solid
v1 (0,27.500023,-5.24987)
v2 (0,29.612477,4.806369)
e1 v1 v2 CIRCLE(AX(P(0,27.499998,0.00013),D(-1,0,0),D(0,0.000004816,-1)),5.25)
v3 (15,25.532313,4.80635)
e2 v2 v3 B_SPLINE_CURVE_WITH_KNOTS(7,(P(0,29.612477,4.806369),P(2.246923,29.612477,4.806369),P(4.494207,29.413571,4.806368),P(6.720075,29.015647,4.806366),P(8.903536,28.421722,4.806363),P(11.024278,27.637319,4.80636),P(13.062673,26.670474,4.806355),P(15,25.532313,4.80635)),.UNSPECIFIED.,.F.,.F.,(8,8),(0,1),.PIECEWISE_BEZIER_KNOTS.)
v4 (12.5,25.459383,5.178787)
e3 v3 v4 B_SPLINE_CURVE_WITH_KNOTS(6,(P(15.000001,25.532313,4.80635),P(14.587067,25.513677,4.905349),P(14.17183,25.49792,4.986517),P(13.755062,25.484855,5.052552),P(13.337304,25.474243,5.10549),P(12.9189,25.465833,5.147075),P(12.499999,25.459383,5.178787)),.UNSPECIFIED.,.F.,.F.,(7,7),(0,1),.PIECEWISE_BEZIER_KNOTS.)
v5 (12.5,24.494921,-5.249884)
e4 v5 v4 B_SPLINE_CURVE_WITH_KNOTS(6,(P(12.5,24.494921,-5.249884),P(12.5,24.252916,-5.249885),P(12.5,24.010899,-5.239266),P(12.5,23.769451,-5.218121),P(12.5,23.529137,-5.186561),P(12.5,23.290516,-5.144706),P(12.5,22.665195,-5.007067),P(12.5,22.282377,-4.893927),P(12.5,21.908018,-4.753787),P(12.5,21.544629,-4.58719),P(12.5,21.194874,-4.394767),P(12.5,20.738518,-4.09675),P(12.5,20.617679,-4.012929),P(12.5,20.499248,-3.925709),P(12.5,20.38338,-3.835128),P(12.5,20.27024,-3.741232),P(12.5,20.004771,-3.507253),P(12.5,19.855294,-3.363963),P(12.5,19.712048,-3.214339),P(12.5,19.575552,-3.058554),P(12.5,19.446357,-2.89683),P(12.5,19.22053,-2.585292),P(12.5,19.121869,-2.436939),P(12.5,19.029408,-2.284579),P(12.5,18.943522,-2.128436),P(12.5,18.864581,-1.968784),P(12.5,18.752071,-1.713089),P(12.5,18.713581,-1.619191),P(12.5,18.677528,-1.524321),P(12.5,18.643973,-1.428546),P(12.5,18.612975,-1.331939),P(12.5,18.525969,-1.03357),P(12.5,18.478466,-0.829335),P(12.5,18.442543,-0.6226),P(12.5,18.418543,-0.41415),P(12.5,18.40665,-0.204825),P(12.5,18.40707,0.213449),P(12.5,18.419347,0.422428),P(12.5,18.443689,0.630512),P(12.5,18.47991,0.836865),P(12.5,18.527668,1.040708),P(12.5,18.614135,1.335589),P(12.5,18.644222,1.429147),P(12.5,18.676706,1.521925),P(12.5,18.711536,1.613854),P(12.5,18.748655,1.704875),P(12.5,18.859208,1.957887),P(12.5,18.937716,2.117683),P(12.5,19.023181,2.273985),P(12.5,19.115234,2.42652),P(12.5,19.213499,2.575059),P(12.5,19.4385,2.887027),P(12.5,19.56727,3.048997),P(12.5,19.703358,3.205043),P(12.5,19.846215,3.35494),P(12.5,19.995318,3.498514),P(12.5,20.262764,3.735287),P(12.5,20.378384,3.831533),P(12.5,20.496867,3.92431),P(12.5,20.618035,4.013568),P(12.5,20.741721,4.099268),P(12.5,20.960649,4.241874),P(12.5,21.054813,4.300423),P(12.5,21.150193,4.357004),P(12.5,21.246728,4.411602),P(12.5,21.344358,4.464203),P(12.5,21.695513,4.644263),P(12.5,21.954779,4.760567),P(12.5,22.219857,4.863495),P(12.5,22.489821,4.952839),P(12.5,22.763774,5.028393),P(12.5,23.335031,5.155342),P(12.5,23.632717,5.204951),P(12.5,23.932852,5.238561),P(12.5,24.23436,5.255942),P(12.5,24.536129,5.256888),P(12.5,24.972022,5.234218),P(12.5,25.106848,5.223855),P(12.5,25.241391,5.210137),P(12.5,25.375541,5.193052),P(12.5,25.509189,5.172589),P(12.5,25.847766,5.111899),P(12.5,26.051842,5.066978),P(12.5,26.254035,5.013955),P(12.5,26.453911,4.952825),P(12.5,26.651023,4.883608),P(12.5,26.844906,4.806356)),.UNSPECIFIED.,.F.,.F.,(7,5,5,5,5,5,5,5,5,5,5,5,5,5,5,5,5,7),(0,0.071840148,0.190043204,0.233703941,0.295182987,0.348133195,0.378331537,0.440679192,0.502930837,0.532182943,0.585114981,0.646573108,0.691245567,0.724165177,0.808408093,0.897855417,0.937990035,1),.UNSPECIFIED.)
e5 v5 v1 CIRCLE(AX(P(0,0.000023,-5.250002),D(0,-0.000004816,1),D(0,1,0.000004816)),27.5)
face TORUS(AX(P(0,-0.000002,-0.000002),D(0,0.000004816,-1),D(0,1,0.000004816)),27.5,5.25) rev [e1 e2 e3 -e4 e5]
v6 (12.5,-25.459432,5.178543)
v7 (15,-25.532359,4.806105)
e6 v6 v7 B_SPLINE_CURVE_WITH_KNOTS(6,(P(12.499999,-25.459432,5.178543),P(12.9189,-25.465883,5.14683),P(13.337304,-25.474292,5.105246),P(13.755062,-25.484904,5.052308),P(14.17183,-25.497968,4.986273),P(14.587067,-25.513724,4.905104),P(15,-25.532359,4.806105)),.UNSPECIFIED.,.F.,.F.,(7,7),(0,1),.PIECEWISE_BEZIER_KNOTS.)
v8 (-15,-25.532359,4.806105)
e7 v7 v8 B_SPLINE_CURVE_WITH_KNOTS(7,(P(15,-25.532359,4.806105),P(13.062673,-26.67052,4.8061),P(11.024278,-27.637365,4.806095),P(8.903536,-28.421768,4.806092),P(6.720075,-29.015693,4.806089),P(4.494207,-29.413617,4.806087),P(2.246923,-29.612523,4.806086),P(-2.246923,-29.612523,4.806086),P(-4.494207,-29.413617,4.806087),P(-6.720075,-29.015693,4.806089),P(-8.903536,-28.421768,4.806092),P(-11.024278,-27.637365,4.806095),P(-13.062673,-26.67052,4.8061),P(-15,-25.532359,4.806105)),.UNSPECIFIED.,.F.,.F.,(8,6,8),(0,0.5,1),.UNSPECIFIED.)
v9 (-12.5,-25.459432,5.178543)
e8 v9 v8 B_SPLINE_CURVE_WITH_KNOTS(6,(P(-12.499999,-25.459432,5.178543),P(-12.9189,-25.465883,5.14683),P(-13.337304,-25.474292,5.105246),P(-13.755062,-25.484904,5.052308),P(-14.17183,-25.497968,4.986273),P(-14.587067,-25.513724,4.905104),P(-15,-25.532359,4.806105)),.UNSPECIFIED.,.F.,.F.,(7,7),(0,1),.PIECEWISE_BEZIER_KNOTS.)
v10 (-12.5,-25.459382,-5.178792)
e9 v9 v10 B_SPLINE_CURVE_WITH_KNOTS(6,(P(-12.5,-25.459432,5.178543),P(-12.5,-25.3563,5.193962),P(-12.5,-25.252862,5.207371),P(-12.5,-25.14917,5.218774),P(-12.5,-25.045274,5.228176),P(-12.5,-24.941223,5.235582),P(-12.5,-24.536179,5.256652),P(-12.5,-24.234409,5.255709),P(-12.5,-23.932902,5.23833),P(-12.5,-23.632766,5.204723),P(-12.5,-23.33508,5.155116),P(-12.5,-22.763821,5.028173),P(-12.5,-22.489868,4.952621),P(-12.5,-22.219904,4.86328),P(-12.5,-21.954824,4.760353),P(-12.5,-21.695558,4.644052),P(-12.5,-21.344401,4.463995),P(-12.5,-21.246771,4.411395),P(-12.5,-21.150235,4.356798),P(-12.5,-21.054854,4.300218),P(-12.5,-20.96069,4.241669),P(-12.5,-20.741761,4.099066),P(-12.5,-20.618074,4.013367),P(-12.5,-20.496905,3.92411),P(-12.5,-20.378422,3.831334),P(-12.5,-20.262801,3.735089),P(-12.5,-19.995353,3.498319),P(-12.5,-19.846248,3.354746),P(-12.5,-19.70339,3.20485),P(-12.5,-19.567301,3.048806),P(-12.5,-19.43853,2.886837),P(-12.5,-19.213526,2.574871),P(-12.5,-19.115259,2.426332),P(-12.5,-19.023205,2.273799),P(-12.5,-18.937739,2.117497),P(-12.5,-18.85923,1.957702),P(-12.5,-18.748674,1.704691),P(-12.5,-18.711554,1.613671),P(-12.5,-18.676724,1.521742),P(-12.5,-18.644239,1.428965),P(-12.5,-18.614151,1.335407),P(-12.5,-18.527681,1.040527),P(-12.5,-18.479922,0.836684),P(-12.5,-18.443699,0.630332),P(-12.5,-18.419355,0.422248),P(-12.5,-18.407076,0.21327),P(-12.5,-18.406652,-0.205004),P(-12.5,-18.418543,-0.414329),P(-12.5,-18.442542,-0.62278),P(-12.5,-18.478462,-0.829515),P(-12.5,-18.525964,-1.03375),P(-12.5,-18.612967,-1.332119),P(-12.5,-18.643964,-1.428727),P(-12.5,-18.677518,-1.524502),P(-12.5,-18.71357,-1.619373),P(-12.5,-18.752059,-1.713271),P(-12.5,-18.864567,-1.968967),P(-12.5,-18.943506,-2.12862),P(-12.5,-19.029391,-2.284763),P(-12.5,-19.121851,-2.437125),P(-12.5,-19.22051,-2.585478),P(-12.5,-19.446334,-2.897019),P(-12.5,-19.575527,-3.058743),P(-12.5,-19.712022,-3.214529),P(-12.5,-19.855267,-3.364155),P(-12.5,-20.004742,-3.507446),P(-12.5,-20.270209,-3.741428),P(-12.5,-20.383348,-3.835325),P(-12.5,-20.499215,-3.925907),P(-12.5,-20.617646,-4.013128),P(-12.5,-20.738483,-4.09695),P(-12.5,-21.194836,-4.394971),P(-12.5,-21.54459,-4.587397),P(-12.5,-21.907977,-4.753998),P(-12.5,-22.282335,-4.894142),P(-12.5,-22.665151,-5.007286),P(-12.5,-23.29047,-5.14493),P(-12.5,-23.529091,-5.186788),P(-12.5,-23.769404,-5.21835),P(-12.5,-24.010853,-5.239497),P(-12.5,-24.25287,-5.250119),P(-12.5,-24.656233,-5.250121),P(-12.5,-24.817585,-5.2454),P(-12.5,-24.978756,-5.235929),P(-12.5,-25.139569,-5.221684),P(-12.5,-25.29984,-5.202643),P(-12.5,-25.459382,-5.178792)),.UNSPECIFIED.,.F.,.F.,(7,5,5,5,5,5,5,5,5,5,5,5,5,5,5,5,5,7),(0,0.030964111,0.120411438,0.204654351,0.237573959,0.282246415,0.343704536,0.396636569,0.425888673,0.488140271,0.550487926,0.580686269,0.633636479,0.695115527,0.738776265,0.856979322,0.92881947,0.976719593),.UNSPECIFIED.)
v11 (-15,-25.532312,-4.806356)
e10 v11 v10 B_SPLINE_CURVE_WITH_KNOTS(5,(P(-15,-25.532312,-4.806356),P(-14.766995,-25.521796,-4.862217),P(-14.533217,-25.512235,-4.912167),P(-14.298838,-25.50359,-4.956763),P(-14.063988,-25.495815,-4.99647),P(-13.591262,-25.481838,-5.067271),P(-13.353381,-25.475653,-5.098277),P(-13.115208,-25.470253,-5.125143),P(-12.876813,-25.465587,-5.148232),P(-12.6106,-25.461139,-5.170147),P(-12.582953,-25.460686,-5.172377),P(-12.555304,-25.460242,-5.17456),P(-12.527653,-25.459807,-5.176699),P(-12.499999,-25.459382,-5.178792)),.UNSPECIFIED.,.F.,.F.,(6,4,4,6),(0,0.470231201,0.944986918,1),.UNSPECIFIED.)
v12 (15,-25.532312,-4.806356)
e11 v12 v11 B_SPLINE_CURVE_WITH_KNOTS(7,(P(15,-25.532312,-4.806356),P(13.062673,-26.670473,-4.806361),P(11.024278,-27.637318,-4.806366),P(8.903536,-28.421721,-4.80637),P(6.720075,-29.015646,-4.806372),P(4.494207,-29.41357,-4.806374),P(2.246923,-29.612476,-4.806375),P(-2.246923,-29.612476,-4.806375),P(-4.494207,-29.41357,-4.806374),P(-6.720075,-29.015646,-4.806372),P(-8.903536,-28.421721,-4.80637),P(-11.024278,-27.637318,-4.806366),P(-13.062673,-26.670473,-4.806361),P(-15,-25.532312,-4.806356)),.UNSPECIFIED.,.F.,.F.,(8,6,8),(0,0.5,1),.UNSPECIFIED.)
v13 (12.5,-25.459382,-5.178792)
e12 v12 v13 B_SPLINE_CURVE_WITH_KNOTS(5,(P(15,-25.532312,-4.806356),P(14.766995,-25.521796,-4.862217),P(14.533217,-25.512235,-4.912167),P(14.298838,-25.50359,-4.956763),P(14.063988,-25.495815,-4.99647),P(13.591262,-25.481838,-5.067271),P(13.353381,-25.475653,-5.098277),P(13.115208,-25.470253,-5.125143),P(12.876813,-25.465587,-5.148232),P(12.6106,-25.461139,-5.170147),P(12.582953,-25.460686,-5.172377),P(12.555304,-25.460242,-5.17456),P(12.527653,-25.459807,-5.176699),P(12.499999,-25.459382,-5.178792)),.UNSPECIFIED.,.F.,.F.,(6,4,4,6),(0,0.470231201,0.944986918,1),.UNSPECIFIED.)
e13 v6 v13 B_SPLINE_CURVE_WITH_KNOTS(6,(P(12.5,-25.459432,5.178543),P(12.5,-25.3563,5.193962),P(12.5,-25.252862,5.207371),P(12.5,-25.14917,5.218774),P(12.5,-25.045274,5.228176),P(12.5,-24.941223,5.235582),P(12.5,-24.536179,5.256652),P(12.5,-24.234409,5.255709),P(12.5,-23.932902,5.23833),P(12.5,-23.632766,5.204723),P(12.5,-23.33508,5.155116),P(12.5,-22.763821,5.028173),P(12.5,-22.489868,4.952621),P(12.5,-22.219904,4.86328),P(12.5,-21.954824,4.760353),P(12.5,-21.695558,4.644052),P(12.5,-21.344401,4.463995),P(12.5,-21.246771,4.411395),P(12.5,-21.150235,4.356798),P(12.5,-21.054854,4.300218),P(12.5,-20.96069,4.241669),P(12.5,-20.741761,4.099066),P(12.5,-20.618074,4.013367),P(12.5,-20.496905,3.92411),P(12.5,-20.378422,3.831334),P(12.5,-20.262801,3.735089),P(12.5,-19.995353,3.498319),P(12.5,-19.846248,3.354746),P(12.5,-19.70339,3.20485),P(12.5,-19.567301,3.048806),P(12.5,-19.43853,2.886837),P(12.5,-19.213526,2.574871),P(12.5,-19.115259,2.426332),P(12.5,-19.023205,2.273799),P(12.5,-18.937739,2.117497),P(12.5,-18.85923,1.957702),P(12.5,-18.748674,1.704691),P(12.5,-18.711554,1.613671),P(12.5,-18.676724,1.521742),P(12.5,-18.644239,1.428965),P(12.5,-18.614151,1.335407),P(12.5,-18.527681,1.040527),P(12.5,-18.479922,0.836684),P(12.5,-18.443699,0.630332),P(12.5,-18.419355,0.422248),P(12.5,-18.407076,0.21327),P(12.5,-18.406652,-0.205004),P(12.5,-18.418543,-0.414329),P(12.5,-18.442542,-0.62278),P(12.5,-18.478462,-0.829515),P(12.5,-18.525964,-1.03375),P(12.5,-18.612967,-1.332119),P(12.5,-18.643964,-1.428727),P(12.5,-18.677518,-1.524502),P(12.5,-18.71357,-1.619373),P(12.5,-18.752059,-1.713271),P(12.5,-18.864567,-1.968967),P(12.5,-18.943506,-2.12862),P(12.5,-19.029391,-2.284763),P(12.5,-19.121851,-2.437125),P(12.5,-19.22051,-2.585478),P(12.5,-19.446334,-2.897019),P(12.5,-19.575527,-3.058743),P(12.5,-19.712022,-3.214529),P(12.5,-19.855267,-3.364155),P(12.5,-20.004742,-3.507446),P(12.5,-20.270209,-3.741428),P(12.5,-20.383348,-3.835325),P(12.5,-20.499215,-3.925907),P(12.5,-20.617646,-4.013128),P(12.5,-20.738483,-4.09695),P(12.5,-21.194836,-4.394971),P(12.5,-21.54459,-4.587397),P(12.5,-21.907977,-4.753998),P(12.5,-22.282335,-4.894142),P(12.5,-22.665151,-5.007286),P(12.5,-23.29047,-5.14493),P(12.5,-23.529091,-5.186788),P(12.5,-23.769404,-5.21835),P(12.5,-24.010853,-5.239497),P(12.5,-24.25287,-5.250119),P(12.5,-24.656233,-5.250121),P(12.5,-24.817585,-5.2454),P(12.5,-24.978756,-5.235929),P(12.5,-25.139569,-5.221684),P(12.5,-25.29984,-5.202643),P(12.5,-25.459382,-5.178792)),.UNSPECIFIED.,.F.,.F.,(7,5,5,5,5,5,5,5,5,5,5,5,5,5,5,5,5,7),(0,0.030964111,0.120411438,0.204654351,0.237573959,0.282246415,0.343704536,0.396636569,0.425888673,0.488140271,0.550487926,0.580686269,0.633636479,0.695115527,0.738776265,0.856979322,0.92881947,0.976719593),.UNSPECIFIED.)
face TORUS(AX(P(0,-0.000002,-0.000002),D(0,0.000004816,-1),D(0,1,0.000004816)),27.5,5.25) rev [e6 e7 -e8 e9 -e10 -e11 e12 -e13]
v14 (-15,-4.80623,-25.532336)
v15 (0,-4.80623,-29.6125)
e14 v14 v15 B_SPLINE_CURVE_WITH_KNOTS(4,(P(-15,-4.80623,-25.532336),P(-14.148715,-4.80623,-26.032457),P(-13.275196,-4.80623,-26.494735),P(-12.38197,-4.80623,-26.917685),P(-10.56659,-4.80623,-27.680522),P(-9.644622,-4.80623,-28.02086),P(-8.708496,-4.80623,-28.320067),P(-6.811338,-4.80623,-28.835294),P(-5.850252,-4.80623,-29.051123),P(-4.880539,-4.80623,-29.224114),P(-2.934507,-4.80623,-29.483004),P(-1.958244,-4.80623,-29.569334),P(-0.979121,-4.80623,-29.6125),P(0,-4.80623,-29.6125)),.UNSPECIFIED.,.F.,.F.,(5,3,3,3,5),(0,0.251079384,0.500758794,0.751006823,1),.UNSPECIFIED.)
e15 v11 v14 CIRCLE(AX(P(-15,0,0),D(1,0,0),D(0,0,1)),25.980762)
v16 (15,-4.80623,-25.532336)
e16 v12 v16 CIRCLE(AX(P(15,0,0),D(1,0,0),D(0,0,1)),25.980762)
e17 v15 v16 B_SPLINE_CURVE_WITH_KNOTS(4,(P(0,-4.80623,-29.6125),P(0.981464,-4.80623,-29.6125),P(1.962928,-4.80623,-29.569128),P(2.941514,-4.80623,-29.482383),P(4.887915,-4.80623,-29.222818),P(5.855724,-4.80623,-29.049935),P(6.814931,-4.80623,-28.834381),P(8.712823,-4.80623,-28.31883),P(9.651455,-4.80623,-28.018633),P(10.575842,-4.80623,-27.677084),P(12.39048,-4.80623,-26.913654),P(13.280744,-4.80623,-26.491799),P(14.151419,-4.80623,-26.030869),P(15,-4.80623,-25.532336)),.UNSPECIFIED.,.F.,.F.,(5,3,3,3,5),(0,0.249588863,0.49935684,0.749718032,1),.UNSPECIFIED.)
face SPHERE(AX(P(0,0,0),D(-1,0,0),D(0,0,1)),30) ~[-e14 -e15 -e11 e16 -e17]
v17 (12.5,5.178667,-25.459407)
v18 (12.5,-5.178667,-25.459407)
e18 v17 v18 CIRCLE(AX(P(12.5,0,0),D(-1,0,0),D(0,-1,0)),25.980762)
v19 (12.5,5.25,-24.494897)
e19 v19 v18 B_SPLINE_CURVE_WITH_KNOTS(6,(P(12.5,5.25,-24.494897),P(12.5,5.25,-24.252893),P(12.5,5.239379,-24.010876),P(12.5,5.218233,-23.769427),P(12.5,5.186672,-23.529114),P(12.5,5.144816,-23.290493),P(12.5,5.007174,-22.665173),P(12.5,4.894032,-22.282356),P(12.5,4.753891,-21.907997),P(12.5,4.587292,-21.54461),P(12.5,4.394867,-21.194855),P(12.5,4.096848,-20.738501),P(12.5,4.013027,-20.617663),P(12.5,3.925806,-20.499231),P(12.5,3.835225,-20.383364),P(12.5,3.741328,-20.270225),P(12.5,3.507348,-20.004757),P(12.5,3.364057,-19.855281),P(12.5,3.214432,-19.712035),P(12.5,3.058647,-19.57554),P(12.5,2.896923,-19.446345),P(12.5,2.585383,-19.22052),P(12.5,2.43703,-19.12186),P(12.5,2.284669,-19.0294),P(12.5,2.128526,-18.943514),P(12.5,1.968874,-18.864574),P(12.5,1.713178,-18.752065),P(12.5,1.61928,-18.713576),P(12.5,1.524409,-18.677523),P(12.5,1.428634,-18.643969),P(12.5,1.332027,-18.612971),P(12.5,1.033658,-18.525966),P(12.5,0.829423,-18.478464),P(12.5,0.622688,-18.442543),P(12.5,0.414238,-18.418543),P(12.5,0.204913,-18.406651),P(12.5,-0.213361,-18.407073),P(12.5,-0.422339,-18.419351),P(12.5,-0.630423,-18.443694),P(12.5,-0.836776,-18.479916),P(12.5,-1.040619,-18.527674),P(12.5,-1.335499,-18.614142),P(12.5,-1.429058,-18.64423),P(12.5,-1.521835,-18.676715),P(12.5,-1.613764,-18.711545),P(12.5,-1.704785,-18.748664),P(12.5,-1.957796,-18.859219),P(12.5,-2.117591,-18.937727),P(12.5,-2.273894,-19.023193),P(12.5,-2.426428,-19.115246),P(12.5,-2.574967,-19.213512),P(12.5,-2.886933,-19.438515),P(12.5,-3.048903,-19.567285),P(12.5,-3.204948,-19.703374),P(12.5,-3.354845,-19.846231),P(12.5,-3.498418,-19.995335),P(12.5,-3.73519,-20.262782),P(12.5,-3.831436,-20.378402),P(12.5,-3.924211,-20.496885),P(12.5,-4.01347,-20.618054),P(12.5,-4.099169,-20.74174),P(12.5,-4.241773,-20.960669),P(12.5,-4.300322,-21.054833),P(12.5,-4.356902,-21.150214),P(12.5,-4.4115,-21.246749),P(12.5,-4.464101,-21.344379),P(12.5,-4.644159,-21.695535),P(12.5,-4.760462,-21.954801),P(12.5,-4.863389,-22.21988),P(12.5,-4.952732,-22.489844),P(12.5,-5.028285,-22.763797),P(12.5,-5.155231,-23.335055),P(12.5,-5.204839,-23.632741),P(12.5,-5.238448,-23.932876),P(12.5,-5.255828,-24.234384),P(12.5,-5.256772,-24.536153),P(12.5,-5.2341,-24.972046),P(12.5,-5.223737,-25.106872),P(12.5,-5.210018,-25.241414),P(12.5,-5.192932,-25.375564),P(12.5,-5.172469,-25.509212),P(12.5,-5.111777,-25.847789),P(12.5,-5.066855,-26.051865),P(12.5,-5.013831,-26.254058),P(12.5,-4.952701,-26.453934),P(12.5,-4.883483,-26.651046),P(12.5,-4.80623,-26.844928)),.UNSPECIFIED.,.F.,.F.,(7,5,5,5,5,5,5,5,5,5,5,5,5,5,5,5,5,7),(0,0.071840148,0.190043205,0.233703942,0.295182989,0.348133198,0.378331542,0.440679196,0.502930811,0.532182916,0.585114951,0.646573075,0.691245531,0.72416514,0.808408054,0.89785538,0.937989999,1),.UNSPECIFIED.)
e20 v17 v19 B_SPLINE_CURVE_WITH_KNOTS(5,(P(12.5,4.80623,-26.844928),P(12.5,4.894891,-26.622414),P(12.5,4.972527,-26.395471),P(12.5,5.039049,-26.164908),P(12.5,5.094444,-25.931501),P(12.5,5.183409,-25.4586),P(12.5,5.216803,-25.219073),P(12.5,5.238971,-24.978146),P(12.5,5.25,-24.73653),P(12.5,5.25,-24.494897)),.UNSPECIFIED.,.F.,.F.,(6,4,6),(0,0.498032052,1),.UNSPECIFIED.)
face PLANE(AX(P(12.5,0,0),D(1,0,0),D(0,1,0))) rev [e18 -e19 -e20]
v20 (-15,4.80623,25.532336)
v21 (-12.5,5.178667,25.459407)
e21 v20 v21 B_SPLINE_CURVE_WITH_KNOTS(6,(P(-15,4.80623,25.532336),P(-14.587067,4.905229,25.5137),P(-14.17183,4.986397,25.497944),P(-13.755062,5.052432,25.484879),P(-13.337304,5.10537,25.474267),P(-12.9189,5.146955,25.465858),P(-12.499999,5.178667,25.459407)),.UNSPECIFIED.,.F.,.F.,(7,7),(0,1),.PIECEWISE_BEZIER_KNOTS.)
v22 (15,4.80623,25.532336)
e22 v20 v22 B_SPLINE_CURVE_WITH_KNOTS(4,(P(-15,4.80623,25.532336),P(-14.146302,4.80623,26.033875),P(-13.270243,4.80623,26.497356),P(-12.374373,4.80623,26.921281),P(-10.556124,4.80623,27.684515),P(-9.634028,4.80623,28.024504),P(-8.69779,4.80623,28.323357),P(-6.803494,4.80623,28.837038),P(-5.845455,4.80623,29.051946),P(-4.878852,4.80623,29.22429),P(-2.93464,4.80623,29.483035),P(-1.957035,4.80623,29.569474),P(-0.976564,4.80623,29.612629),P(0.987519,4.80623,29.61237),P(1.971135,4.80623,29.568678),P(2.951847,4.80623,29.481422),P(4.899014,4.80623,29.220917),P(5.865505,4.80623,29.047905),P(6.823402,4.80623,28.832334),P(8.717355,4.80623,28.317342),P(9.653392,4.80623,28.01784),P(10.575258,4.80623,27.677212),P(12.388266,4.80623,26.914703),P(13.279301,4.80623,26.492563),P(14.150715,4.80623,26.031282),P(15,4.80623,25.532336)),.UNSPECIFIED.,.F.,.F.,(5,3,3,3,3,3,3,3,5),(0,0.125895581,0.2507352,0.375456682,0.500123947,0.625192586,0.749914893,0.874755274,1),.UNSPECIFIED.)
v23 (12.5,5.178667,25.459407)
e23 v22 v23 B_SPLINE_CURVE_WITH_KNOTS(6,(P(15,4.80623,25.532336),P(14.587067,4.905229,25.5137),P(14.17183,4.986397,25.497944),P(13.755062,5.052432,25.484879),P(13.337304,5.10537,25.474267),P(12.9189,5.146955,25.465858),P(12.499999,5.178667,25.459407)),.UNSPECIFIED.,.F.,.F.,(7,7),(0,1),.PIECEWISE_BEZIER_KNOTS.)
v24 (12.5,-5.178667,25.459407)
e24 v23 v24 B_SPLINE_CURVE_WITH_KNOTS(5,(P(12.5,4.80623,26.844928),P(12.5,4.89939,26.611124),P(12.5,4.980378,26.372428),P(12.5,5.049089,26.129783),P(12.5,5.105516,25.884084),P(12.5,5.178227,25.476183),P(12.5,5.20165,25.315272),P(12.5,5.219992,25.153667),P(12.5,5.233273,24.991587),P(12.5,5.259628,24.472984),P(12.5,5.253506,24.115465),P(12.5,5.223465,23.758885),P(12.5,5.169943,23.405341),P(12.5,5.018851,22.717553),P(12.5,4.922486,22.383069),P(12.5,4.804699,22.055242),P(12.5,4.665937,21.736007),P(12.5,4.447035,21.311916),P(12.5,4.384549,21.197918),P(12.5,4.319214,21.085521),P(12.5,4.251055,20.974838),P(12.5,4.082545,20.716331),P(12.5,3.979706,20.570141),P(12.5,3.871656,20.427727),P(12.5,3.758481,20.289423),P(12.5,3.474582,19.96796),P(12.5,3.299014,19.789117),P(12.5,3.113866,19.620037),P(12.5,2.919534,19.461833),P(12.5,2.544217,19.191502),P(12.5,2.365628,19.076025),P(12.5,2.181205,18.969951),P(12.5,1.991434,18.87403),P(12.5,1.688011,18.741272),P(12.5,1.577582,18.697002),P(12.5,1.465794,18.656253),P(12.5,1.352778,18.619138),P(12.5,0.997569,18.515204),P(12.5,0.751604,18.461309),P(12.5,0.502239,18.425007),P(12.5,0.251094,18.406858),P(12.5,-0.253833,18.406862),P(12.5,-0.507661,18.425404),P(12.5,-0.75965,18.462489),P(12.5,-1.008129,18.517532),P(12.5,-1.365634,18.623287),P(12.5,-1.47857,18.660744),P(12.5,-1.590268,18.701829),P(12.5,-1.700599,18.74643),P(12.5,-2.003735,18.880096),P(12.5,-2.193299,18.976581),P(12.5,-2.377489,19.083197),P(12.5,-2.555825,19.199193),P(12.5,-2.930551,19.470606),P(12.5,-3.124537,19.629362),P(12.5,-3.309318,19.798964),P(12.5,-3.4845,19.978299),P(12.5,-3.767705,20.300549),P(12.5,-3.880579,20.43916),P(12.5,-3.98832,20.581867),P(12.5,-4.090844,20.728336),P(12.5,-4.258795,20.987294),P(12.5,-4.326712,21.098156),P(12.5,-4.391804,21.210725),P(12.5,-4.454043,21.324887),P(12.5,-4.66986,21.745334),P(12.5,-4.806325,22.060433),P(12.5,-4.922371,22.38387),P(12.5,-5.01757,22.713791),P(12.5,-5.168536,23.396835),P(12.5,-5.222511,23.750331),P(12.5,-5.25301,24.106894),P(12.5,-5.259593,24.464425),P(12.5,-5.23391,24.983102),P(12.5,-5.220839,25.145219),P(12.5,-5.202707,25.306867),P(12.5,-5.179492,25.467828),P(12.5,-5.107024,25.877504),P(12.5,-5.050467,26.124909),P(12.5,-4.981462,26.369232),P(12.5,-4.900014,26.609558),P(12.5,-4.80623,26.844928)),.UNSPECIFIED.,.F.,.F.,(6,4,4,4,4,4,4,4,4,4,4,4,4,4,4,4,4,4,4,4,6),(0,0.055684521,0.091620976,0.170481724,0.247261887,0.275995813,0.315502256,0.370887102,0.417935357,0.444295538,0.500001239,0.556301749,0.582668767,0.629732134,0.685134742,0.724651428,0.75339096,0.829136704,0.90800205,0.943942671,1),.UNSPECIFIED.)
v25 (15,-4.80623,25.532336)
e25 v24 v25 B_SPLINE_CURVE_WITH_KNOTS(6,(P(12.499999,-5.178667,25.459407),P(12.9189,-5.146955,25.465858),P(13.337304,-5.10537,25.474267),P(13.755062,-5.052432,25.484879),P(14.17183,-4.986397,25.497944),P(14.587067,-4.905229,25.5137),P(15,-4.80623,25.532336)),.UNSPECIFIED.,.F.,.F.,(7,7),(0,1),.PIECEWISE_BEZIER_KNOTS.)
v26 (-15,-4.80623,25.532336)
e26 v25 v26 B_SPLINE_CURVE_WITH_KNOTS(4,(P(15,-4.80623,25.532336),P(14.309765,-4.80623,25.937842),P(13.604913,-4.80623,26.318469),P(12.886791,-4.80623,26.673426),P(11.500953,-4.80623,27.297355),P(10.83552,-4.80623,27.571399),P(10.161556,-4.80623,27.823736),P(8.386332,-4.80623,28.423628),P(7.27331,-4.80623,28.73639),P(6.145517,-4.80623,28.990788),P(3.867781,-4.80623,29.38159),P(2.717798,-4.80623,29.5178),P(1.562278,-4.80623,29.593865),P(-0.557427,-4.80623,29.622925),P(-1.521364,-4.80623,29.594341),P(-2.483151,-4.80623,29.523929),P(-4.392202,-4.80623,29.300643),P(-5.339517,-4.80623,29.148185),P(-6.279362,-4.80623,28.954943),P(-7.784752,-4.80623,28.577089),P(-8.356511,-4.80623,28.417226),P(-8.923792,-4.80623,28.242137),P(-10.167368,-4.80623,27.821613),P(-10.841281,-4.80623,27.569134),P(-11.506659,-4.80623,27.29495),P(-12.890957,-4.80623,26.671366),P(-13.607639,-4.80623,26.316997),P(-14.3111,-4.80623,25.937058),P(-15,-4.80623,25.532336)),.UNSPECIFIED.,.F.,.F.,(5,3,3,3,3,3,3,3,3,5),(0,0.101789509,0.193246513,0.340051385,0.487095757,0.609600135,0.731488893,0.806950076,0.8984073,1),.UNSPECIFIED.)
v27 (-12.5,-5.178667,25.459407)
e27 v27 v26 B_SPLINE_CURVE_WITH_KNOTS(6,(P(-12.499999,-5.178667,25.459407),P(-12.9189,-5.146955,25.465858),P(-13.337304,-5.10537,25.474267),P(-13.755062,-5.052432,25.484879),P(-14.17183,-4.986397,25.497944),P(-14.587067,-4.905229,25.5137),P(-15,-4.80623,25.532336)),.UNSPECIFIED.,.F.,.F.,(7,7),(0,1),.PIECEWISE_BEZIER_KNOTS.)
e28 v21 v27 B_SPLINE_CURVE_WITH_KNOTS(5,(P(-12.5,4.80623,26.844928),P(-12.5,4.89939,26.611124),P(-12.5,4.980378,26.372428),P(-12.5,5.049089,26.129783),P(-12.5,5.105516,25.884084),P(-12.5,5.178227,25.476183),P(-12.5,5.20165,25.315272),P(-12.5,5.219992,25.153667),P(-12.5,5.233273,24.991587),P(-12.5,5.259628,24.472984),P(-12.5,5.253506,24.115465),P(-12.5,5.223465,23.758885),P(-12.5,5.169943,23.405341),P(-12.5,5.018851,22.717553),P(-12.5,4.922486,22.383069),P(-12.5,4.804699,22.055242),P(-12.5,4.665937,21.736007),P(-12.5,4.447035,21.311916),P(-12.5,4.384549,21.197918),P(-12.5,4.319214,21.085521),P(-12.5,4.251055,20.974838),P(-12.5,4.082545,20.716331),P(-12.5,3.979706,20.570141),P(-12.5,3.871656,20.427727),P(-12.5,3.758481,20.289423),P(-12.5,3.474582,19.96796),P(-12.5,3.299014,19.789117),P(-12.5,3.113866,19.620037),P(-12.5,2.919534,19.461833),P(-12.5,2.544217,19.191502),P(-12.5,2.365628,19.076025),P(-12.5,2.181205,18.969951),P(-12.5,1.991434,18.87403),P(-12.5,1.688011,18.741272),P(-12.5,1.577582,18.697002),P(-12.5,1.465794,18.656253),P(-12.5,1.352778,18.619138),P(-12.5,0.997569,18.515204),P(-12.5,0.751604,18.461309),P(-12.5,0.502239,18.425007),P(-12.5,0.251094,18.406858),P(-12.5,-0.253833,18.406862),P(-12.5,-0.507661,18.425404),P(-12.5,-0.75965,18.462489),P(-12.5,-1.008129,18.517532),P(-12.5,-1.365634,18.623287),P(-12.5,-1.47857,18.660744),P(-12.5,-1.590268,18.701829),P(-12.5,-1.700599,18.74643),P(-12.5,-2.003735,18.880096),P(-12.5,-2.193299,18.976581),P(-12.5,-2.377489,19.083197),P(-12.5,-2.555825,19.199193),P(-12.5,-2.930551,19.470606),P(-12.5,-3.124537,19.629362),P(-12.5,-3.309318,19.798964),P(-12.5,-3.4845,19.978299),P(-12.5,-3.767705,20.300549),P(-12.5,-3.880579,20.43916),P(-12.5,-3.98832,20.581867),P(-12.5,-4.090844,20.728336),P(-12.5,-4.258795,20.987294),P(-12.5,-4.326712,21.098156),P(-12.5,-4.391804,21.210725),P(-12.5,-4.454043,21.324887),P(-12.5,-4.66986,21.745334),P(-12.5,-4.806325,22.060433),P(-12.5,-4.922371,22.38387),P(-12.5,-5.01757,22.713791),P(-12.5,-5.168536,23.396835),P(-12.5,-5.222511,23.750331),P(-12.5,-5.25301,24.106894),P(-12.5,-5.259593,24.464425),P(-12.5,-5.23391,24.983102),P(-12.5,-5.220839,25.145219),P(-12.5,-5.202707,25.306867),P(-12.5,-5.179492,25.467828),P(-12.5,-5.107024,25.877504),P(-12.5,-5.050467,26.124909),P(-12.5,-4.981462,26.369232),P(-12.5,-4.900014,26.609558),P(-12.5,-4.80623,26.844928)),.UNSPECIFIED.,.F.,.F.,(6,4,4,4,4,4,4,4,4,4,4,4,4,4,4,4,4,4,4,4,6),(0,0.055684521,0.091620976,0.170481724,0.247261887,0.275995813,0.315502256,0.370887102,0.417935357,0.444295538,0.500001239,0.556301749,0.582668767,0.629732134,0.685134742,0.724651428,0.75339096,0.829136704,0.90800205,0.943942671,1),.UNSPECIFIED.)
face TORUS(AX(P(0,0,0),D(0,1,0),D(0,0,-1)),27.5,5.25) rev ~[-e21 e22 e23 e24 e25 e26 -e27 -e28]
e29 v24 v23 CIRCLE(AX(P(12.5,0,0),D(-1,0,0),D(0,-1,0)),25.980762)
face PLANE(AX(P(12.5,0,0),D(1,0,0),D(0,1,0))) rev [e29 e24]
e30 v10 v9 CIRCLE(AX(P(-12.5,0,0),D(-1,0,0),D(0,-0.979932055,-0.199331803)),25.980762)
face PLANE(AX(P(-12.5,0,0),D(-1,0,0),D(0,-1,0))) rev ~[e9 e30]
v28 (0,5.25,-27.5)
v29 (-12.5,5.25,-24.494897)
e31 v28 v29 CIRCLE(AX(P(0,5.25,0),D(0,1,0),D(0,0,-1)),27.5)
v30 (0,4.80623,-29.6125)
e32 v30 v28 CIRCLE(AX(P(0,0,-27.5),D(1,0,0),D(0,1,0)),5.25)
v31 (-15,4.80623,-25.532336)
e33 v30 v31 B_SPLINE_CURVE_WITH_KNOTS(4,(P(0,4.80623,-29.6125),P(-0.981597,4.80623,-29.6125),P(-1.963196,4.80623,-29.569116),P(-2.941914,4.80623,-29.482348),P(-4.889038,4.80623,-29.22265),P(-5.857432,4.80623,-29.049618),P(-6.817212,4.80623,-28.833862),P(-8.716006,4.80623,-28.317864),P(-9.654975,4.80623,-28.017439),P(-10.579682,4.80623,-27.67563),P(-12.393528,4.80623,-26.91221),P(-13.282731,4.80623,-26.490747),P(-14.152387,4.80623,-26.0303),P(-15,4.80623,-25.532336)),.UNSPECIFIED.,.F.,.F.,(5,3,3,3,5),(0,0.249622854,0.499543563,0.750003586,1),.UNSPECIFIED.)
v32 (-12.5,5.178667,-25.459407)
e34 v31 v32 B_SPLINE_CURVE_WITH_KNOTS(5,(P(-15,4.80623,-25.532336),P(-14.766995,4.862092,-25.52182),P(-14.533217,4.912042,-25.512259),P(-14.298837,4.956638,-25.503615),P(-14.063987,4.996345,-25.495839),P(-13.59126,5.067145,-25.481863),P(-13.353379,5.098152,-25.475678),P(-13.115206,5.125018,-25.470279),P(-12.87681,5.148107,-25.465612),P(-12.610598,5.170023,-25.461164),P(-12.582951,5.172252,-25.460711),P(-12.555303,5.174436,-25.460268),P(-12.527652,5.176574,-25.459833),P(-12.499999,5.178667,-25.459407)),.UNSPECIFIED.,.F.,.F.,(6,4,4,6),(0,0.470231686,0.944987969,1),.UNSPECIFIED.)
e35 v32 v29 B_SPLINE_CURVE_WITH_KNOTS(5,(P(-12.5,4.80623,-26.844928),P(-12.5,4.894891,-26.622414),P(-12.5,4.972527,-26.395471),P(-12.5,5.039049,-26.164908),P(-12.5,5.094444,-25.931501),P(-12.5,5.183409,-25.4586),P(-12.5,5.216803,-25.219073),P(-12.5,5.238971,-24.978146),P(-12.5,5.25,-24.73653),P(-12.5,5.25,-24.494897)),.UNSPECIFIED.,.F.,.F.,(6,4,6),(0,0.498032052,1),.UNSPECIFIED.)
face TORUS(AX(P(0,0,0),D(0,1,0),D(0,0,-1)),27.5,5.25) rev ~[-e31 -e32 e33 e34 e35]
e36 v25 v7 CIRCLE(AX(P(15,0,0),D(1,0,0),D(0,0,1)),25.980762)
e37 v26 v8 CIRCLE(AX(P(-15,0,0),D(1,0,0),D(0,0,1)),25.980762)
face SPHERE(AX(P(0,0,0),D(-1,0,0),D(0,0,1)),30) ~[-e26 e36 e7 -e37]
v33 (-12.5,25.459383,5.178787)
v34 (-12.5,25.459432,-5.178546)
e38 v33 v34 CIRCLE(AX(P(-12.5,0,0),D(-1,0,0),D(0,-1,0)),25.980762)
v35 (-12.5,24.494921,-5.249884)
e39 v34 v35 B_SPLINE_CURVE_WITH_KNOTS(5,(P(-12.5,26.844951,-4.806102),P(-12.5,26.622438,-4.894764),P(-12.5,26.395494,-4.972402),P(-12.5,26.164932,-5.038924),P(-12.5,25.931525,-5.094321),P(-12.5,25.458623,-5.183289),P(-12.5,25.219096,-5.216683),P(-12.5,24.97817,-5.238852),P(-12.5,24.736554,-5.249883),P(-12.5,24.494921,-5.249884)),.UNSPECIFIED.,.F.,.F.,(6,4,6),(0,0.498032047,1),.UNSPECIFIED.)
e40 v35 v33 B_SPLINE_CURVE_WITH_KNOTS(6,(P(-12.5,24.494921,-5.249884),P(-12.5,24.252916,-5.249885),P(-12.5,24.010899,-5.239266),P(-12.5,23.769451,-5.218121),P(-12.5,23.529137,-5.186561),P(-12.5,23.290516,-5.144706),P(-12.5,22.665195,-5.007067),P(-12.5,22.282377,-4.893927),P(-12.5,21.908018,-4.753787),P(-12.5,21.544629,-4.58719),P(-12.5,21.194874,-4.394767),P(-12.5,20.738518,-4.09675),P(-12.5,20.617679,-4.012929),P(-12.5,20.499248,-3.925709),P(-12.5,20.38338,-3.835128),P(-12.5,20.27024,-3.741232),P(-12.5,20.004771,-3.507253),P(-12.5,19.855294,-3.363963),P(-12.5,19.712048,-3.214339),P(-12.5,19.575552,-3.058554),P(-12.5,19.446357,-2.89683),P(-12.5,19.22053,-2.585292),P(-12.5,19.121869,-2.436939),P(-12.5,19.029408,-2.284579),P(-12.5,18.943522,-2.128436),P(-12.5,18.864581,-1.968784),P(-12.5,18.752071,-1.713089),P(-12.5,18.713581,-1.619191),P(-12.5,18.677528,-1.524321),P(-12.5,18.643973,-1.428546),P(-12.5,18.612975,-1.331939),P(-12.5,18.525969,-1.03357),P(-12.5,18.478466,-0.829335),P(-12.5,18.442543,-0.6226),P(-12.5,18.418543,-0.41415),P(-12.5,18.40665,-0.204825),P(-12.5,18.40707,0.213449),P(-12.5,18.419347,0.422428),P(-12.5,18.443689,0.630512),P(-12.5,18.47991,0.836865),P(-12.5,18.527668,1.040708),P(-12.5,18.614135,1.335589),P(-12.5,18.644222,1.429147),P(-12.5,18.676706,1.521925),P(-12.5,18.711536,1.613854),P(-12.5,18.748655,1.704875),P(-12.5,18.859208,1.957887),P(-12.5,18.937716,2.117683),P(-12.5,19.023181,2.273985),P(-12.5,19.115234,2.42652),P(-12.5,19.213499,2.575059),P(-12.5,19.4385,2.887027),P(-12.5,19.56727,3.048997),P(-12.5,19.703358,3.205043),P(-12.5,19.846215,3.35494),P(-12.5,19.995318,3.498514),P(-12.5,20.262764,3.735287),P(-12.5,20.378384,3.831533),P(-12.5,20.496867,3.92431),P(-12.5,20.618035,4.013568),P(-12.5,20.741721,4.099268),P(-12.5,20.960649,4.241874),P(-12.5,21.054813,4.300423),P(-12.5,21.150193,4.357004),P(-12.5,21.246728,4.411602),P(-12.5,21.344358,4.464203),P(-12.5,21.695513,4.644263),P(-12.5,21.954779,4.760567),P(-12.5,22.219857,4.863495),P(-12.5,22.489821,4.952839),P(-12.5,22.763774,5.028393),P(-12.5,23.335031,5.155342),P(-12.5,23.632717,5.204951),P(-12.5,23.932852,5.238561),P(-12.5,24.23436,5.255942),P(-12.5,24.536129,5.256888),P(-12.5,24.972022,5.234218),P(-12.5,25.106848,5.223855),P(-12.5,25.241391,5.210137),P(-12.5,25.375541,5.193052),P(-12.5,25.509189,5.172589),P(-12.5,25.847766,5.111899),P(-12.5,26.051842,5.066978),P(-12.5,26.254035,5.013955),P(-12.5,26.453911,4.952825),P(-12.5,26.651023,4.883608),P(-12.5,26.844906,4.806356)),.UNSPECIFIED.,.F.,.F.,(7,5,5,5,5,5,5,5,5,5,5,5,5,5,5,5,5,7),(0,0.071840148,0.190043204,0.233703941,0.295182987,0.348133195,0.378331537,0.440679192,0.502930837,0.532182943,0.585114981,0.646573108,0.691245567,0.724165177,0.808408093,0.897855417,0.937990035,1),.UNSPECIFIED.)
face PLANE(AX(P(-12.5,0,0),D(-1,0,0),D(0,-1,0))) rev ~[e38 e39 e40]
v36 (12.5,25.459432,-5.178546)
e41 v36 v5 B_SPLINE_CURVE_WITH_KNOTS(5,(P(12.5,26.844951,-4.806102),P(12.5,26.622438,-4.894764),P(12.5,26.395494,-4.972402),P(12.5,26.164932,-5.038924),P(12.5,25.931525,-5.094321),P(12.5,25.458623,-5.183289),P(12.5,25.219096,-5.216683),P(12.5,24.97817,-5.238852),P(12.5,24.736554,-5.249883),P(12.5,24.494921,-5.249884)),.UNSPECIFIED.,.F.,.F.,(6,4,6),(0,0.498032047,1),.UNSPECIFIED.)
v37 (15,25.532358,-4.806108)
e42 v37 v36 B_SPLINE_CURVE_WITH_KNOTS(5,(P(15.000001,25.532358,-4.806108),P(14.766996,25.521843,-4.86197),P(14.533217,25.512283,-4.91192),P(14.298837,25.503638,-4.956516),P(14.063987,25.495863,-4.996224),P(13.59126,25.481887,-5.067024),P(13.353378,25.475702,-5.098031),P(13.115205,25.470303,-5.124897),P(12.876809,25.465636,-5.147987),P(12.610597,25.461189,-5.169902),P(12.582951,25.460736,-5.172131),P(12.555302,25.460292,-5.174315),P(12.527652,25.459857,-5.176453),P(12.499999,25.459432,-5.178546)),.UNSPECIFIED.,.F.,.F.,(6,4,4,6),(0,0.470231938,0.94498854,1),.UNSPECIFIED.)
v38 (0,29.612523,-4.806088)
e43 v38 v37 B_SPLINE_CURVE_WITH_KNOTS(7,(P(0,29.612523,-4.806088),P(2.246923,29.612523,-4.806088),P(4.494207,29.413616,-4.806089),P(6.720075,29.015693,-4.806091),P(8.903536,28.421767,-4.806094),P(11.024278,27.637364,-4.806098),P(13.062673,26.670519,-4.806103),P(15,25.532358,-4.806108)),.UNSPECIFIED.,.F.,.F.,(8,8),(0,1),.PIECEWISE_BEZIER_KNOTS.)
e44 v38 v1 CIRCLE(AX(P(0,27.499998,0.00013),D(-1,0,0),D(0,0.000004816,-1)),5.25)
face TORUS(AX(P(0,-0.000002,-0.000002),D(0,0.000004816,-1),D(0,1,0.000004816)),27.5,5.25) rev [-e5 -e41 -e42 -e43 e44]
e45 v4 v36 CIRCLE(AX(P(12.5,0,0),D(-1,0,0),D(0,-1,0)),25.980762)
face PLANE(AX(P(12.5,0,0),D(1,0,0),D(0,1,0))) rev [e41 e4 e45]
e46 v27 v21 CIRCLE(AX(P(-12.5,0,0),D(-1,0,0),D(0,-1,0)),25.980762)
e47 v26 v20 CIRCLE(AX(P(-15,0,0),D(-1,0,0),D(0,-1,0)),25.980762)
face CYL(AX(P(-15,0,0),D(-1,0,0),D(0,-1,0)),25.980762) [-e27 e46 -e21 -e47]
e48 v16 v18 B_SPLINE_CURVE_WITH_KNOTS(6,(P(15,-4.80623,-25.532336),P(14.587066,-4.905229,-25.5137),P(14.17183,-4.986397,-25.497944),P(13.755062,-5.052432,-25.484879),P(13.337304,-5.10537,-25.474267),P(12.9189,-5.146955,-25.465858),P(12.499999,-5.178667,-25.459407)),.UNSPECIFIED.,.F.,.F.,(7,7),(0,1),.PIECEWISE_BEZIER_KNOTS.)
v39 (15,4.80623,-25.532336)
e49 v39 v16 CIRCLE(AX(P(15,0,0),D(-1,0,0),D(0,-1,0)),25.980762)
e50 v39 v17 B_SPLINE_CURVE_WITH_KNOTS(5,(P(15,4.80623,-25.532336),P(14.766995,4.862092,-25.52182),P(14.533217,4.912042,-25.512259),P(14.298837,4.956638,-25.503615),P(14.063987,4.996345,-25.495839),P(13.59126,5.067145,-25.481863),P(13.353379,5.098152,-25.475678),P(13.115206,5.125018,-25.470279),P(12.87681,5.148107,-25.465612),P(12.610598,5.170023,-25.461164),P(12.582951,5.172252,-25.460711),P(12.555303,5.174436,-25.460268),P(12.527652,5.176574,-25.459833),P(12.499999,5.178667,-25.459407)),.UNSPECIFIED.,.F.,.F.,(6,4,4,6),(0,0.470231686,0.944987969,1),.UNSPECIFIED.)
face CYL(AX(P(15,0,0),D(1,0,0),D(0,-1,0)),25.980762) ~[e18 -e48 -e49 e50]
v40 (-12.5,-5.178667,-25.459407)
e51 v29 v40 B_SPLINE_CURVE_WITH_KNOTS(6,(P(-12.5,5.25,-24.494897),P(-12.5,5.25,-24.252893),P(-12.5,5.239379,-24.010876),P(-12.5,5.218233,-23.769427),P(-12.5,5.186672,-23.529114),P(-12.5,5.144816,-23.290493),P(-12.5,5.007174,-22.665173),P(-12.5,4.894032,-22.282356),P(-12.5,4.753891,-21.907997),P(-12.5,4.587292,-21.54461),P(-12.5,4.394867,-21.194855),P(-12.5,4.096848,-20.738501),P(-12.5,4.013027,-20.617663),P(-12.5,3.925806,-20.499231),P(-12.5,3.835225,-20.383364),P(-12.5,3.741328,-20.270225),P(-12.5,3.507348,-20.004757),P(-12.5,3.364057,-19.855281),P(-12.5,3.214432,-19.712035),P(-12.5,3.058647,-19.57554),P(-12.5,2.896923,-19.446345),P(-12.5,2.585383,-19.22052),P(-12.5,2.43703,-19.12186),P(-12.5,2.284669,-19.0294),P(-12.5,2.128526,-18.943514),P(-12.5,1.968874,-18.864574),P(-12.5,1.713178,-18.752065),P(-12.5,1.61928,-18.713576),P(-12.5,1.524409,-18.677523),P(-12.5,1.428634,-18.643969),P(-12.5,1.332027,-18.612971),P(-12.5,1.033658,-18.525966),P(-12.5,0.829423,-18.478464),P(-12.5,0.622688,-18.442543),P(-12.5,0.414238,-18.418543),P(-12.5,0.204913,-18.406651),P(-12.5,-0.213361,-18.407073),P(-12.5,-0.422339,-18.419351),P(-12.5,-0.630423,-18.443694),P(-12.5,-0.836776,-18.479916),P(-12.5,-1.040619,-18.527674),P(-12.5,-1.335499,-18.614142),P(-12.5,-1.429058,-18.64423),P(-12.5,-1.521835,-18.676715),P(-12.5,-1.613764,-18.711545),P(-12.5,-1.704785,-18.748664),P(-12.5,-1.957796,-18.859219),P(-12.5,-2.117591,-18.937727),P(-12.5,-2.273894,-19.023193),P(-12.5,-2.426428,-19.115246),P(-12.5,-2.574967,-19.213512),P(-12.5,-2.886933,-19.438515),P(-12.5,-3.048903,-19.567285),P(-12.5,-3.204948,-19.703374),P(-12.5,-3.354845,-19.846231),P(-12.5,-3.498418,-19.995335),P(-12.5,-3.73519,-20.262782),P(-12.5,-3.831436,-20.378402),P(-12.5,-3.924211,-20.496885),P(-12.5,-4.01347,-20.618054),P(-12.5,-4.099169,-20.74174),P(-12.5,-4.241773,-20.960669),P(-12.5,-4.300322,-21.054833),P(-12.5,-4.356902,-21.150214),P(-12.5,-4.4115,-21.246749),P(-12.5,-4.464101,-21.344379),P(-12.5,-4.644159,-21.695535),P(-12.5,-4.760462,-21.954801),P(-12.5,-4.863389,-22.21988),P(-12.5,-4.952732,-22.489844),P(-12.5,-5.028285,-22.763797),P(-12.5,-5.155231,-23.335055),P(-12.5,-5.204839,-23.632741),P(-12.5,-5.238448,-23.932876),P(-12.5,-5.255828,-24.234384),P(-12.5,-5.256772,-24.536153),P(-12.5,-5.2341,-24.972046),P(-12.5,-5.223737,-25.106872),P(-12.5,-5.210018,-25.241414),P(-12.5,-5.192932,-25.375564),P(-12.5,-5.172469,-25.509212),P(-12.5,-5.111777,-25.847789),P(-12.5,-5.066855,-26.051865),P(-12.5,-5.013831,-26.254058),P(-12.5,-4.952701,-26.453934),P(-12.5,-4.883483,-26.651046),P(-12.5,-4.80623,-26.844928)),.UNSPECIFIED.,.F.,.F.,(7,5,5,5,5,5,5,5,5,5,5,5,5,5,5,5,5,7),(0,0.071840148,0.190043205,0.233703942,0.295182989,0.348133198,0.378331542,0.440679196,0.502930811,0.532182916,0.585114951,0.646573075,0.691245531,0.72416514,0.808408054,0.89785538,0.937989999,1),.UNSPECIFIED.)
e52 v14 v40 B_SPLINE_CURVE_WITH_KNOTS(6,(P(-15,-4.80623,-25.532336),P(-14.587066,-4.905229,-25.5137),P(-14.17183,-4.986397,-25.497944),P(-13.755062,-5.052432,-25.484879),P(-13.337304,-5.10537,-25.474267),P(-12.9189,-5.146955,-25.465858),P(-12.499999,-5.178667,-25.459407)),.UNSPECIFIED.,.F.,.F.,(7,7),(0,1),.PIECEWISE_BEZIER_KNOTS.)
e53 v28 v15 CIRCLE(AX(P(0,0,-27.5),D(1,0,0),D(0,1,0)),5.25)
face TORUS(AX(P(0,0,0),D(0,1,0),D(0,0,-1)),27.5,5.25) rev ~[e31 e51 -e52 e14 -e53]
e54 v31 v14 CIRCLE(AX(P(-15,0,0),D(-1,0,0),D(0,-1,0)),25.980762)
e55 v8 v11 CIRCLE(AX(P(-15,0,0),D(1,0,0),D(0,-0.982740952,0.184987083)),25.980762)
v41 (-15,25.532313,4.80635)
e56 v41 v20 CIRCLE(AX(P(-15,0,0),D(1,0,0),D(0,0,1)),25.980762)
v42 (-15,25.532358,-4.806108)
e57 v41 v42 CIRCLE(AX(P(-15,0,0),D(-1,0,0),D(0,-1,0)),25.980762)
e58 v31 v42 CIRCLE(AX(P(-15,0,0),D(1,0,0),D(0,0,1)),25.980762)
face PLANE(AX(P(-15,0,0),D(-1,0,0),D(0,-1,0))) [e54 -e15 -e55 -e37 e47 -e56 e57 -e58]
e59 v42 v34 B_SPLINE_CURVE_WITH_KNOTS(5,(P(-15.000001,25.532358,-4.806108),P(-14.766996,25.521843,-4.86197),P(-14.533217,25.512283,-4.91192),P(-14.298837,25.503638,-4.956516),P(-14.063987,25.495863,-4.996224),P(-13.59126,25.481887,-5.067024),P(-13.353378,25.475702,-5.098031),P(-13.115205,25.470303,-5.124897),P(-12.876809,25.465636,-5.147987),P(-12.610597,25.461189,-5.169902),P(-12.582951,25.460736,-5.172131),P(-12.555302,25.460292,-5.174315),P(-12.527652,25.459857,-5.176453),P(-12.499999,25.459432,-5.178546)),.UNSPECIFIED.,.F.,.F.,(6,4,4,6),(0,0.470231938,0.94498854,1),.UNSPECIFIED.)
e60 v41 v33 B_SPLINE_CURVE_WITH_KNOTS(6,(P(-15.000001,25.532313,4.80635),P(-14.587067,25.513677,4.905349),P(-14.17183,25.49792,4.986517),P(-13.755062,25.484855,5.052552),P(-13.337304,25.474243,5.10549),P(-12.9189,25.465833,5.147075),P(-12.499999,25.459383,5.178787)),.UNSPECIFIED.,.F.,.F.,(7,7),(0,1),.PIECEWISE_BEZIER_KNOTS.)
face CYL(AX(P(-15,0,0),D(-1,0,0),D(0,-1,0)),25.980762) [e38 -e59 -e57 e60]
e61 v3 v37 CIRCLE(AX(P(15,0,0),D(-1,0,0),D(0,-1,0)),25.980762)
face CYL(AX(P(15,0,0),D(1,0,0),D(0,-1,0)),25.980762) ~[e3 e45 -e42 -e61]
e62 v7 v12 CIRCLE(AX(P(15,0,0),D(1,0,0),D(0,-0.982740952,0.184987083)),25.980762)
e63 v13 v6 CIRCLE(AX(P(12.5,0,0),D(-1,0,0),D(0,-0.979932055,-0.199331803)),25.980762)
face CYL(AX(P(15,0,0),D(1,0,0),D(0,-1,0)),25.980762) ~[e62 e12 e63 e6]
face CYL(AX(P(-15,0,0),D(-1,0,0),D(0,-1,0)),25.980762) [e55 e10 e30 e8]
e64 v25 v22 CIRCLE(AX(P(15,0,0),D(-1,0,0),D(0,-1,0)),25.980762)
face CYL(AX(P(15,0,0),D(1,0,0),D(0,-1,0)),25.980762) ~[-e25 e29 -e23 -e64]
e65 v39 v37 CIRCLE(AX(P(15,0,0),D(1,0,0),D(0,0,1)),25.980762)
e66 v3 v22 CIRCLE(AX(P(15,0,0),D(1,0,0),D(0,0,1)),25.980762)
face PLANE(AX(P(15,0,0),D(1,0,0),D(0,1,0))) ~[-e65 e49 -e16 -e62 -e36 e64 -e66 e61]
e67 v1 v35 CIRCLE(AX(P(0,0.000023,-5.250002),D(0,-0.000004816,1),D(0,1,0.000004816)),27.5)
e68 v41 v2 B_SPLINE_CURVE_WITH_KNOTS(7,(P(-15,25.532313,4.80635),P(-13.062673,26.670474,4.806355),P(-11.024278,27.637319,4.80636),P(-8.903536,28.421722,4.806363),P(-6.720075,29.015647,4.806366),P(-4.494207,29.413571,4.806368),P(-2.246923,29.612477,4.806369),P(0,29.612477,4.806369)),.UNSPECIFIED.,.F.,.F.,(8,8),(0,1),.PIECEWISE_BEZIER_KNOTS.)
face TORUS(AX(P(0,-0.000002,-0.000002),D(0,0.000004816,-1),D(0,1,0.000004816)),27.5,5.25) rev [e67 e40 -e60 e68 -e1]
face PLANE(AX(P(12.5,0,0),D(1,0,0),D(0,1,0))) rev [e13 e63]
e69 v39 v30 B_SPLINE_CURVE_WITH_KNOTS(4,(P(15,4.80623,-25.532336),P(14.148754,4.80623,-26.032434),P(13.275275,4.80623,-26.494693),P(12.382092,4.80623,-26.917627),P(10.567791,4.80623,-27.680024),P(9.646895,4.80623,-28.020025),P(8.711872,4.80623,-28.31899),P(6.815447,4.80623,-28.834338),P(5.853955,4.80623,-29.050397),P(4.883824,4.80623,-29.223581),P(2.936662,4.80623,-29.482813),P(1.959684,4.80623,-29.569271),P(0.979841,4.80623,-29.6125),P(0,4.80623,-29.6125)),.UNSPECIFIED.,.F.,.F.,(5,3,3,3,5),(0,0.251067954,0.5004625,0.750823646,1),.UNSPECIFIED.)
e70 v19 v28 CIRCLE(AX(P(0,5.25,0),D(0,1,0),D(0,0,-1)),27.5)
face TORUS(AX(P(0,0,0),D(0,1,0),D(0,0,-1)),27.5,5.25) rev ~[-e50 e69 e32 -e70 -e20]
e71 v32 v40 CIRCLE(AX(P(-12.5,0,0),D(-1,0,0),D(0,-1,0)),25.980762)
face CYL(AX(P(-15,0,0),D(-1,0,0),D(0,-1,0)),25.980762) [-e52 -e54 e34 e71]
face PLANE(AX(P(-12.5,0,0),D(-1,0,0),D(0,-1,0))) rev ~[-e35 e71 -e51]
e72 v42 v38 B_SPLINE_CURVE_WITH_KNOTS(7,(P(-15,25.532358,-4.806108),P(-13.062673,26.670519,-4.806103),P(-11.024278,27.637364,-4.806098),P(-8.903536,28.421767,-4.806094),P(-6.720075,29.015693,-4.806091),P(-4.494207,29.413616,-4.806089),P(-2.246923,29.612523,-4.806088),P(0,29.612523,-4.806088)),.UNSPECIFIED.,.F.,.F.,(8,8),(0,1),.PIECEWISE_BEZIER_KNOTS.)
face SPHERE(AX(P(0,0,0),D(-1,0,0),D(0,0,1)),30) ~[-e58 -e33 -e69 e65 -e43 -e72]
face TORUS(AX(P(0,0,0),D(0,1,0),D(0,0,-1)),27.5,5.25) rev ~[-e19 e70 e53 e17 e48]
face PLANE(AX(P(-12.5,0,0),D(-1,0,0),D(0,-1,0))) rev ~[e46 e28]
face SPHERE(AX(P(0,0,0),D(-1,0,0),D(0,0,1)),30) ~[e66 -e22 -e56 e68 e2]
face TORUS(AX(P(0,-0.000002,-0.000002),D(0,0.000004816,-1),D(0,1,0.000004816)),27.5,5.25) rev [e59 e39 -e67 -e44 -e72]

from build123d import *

# Parameters (mm, degrees)
F2_R     = 5.25
F4_R     = 25.9807621135
F5_DEPTH = 2.5


# Not quite as in the source:
# - a pattern or mirror of a feature is missing from the dataset's text; its kind, count and spacing are read off the source's solid


with BuildPart() as f1:
    # F0 (on Front) → F1 (revolve)
    with BuildSketch(Plane.XZ):
        with BuildLine():
            Line((-15, 25.9807621135), (-15, 0))
            Line((-15, 0), (15, 0))
            Line((15, 0), (15, 25.9807621135))
            ThreePointArc((15, 25.9807621135), (0, 30), (-15, 25.9807621135))
        make_face()
    revolve(axis=Axis((0, 0, 0), (1, 0, 0)))

    # F2 (on Right) → F3 (revolve, cut)
    with BuildSketch(Plane.YZ):
        with Locations((0, -27.5)):
            Circle(F2_R)
    f3 = revolve(axis=Axis((0, 15, 0), (0, 1, 0)), mode=Mode.SUBTRACT)

    # F3_copies: F3 across plane
    add(f3.mirror(Plane(origin=(0, -1e-06, -1e-06), x_dir=(0, -0.7071084838, 0.7071050786), z_dir=(0, -0.7071050786, -0.7071084838))), mode=Mode.SUBTRACT)

    # F4 (on face) → F5 (join)
    with BuildSketch(Plane(origin=(-15, 0, 0), x_dir=(0, -1, 0), z_dir=(-1, 0, 0))):
        Circle(F4_R)
    extrude(amount=-F5_DEPTH)

    # F6: F1 across plane


with BuildPart() as f1_1:
    add(f1.part)
    add(f1.part.mirror(Plane.YZ))


solid = f1_1.part
